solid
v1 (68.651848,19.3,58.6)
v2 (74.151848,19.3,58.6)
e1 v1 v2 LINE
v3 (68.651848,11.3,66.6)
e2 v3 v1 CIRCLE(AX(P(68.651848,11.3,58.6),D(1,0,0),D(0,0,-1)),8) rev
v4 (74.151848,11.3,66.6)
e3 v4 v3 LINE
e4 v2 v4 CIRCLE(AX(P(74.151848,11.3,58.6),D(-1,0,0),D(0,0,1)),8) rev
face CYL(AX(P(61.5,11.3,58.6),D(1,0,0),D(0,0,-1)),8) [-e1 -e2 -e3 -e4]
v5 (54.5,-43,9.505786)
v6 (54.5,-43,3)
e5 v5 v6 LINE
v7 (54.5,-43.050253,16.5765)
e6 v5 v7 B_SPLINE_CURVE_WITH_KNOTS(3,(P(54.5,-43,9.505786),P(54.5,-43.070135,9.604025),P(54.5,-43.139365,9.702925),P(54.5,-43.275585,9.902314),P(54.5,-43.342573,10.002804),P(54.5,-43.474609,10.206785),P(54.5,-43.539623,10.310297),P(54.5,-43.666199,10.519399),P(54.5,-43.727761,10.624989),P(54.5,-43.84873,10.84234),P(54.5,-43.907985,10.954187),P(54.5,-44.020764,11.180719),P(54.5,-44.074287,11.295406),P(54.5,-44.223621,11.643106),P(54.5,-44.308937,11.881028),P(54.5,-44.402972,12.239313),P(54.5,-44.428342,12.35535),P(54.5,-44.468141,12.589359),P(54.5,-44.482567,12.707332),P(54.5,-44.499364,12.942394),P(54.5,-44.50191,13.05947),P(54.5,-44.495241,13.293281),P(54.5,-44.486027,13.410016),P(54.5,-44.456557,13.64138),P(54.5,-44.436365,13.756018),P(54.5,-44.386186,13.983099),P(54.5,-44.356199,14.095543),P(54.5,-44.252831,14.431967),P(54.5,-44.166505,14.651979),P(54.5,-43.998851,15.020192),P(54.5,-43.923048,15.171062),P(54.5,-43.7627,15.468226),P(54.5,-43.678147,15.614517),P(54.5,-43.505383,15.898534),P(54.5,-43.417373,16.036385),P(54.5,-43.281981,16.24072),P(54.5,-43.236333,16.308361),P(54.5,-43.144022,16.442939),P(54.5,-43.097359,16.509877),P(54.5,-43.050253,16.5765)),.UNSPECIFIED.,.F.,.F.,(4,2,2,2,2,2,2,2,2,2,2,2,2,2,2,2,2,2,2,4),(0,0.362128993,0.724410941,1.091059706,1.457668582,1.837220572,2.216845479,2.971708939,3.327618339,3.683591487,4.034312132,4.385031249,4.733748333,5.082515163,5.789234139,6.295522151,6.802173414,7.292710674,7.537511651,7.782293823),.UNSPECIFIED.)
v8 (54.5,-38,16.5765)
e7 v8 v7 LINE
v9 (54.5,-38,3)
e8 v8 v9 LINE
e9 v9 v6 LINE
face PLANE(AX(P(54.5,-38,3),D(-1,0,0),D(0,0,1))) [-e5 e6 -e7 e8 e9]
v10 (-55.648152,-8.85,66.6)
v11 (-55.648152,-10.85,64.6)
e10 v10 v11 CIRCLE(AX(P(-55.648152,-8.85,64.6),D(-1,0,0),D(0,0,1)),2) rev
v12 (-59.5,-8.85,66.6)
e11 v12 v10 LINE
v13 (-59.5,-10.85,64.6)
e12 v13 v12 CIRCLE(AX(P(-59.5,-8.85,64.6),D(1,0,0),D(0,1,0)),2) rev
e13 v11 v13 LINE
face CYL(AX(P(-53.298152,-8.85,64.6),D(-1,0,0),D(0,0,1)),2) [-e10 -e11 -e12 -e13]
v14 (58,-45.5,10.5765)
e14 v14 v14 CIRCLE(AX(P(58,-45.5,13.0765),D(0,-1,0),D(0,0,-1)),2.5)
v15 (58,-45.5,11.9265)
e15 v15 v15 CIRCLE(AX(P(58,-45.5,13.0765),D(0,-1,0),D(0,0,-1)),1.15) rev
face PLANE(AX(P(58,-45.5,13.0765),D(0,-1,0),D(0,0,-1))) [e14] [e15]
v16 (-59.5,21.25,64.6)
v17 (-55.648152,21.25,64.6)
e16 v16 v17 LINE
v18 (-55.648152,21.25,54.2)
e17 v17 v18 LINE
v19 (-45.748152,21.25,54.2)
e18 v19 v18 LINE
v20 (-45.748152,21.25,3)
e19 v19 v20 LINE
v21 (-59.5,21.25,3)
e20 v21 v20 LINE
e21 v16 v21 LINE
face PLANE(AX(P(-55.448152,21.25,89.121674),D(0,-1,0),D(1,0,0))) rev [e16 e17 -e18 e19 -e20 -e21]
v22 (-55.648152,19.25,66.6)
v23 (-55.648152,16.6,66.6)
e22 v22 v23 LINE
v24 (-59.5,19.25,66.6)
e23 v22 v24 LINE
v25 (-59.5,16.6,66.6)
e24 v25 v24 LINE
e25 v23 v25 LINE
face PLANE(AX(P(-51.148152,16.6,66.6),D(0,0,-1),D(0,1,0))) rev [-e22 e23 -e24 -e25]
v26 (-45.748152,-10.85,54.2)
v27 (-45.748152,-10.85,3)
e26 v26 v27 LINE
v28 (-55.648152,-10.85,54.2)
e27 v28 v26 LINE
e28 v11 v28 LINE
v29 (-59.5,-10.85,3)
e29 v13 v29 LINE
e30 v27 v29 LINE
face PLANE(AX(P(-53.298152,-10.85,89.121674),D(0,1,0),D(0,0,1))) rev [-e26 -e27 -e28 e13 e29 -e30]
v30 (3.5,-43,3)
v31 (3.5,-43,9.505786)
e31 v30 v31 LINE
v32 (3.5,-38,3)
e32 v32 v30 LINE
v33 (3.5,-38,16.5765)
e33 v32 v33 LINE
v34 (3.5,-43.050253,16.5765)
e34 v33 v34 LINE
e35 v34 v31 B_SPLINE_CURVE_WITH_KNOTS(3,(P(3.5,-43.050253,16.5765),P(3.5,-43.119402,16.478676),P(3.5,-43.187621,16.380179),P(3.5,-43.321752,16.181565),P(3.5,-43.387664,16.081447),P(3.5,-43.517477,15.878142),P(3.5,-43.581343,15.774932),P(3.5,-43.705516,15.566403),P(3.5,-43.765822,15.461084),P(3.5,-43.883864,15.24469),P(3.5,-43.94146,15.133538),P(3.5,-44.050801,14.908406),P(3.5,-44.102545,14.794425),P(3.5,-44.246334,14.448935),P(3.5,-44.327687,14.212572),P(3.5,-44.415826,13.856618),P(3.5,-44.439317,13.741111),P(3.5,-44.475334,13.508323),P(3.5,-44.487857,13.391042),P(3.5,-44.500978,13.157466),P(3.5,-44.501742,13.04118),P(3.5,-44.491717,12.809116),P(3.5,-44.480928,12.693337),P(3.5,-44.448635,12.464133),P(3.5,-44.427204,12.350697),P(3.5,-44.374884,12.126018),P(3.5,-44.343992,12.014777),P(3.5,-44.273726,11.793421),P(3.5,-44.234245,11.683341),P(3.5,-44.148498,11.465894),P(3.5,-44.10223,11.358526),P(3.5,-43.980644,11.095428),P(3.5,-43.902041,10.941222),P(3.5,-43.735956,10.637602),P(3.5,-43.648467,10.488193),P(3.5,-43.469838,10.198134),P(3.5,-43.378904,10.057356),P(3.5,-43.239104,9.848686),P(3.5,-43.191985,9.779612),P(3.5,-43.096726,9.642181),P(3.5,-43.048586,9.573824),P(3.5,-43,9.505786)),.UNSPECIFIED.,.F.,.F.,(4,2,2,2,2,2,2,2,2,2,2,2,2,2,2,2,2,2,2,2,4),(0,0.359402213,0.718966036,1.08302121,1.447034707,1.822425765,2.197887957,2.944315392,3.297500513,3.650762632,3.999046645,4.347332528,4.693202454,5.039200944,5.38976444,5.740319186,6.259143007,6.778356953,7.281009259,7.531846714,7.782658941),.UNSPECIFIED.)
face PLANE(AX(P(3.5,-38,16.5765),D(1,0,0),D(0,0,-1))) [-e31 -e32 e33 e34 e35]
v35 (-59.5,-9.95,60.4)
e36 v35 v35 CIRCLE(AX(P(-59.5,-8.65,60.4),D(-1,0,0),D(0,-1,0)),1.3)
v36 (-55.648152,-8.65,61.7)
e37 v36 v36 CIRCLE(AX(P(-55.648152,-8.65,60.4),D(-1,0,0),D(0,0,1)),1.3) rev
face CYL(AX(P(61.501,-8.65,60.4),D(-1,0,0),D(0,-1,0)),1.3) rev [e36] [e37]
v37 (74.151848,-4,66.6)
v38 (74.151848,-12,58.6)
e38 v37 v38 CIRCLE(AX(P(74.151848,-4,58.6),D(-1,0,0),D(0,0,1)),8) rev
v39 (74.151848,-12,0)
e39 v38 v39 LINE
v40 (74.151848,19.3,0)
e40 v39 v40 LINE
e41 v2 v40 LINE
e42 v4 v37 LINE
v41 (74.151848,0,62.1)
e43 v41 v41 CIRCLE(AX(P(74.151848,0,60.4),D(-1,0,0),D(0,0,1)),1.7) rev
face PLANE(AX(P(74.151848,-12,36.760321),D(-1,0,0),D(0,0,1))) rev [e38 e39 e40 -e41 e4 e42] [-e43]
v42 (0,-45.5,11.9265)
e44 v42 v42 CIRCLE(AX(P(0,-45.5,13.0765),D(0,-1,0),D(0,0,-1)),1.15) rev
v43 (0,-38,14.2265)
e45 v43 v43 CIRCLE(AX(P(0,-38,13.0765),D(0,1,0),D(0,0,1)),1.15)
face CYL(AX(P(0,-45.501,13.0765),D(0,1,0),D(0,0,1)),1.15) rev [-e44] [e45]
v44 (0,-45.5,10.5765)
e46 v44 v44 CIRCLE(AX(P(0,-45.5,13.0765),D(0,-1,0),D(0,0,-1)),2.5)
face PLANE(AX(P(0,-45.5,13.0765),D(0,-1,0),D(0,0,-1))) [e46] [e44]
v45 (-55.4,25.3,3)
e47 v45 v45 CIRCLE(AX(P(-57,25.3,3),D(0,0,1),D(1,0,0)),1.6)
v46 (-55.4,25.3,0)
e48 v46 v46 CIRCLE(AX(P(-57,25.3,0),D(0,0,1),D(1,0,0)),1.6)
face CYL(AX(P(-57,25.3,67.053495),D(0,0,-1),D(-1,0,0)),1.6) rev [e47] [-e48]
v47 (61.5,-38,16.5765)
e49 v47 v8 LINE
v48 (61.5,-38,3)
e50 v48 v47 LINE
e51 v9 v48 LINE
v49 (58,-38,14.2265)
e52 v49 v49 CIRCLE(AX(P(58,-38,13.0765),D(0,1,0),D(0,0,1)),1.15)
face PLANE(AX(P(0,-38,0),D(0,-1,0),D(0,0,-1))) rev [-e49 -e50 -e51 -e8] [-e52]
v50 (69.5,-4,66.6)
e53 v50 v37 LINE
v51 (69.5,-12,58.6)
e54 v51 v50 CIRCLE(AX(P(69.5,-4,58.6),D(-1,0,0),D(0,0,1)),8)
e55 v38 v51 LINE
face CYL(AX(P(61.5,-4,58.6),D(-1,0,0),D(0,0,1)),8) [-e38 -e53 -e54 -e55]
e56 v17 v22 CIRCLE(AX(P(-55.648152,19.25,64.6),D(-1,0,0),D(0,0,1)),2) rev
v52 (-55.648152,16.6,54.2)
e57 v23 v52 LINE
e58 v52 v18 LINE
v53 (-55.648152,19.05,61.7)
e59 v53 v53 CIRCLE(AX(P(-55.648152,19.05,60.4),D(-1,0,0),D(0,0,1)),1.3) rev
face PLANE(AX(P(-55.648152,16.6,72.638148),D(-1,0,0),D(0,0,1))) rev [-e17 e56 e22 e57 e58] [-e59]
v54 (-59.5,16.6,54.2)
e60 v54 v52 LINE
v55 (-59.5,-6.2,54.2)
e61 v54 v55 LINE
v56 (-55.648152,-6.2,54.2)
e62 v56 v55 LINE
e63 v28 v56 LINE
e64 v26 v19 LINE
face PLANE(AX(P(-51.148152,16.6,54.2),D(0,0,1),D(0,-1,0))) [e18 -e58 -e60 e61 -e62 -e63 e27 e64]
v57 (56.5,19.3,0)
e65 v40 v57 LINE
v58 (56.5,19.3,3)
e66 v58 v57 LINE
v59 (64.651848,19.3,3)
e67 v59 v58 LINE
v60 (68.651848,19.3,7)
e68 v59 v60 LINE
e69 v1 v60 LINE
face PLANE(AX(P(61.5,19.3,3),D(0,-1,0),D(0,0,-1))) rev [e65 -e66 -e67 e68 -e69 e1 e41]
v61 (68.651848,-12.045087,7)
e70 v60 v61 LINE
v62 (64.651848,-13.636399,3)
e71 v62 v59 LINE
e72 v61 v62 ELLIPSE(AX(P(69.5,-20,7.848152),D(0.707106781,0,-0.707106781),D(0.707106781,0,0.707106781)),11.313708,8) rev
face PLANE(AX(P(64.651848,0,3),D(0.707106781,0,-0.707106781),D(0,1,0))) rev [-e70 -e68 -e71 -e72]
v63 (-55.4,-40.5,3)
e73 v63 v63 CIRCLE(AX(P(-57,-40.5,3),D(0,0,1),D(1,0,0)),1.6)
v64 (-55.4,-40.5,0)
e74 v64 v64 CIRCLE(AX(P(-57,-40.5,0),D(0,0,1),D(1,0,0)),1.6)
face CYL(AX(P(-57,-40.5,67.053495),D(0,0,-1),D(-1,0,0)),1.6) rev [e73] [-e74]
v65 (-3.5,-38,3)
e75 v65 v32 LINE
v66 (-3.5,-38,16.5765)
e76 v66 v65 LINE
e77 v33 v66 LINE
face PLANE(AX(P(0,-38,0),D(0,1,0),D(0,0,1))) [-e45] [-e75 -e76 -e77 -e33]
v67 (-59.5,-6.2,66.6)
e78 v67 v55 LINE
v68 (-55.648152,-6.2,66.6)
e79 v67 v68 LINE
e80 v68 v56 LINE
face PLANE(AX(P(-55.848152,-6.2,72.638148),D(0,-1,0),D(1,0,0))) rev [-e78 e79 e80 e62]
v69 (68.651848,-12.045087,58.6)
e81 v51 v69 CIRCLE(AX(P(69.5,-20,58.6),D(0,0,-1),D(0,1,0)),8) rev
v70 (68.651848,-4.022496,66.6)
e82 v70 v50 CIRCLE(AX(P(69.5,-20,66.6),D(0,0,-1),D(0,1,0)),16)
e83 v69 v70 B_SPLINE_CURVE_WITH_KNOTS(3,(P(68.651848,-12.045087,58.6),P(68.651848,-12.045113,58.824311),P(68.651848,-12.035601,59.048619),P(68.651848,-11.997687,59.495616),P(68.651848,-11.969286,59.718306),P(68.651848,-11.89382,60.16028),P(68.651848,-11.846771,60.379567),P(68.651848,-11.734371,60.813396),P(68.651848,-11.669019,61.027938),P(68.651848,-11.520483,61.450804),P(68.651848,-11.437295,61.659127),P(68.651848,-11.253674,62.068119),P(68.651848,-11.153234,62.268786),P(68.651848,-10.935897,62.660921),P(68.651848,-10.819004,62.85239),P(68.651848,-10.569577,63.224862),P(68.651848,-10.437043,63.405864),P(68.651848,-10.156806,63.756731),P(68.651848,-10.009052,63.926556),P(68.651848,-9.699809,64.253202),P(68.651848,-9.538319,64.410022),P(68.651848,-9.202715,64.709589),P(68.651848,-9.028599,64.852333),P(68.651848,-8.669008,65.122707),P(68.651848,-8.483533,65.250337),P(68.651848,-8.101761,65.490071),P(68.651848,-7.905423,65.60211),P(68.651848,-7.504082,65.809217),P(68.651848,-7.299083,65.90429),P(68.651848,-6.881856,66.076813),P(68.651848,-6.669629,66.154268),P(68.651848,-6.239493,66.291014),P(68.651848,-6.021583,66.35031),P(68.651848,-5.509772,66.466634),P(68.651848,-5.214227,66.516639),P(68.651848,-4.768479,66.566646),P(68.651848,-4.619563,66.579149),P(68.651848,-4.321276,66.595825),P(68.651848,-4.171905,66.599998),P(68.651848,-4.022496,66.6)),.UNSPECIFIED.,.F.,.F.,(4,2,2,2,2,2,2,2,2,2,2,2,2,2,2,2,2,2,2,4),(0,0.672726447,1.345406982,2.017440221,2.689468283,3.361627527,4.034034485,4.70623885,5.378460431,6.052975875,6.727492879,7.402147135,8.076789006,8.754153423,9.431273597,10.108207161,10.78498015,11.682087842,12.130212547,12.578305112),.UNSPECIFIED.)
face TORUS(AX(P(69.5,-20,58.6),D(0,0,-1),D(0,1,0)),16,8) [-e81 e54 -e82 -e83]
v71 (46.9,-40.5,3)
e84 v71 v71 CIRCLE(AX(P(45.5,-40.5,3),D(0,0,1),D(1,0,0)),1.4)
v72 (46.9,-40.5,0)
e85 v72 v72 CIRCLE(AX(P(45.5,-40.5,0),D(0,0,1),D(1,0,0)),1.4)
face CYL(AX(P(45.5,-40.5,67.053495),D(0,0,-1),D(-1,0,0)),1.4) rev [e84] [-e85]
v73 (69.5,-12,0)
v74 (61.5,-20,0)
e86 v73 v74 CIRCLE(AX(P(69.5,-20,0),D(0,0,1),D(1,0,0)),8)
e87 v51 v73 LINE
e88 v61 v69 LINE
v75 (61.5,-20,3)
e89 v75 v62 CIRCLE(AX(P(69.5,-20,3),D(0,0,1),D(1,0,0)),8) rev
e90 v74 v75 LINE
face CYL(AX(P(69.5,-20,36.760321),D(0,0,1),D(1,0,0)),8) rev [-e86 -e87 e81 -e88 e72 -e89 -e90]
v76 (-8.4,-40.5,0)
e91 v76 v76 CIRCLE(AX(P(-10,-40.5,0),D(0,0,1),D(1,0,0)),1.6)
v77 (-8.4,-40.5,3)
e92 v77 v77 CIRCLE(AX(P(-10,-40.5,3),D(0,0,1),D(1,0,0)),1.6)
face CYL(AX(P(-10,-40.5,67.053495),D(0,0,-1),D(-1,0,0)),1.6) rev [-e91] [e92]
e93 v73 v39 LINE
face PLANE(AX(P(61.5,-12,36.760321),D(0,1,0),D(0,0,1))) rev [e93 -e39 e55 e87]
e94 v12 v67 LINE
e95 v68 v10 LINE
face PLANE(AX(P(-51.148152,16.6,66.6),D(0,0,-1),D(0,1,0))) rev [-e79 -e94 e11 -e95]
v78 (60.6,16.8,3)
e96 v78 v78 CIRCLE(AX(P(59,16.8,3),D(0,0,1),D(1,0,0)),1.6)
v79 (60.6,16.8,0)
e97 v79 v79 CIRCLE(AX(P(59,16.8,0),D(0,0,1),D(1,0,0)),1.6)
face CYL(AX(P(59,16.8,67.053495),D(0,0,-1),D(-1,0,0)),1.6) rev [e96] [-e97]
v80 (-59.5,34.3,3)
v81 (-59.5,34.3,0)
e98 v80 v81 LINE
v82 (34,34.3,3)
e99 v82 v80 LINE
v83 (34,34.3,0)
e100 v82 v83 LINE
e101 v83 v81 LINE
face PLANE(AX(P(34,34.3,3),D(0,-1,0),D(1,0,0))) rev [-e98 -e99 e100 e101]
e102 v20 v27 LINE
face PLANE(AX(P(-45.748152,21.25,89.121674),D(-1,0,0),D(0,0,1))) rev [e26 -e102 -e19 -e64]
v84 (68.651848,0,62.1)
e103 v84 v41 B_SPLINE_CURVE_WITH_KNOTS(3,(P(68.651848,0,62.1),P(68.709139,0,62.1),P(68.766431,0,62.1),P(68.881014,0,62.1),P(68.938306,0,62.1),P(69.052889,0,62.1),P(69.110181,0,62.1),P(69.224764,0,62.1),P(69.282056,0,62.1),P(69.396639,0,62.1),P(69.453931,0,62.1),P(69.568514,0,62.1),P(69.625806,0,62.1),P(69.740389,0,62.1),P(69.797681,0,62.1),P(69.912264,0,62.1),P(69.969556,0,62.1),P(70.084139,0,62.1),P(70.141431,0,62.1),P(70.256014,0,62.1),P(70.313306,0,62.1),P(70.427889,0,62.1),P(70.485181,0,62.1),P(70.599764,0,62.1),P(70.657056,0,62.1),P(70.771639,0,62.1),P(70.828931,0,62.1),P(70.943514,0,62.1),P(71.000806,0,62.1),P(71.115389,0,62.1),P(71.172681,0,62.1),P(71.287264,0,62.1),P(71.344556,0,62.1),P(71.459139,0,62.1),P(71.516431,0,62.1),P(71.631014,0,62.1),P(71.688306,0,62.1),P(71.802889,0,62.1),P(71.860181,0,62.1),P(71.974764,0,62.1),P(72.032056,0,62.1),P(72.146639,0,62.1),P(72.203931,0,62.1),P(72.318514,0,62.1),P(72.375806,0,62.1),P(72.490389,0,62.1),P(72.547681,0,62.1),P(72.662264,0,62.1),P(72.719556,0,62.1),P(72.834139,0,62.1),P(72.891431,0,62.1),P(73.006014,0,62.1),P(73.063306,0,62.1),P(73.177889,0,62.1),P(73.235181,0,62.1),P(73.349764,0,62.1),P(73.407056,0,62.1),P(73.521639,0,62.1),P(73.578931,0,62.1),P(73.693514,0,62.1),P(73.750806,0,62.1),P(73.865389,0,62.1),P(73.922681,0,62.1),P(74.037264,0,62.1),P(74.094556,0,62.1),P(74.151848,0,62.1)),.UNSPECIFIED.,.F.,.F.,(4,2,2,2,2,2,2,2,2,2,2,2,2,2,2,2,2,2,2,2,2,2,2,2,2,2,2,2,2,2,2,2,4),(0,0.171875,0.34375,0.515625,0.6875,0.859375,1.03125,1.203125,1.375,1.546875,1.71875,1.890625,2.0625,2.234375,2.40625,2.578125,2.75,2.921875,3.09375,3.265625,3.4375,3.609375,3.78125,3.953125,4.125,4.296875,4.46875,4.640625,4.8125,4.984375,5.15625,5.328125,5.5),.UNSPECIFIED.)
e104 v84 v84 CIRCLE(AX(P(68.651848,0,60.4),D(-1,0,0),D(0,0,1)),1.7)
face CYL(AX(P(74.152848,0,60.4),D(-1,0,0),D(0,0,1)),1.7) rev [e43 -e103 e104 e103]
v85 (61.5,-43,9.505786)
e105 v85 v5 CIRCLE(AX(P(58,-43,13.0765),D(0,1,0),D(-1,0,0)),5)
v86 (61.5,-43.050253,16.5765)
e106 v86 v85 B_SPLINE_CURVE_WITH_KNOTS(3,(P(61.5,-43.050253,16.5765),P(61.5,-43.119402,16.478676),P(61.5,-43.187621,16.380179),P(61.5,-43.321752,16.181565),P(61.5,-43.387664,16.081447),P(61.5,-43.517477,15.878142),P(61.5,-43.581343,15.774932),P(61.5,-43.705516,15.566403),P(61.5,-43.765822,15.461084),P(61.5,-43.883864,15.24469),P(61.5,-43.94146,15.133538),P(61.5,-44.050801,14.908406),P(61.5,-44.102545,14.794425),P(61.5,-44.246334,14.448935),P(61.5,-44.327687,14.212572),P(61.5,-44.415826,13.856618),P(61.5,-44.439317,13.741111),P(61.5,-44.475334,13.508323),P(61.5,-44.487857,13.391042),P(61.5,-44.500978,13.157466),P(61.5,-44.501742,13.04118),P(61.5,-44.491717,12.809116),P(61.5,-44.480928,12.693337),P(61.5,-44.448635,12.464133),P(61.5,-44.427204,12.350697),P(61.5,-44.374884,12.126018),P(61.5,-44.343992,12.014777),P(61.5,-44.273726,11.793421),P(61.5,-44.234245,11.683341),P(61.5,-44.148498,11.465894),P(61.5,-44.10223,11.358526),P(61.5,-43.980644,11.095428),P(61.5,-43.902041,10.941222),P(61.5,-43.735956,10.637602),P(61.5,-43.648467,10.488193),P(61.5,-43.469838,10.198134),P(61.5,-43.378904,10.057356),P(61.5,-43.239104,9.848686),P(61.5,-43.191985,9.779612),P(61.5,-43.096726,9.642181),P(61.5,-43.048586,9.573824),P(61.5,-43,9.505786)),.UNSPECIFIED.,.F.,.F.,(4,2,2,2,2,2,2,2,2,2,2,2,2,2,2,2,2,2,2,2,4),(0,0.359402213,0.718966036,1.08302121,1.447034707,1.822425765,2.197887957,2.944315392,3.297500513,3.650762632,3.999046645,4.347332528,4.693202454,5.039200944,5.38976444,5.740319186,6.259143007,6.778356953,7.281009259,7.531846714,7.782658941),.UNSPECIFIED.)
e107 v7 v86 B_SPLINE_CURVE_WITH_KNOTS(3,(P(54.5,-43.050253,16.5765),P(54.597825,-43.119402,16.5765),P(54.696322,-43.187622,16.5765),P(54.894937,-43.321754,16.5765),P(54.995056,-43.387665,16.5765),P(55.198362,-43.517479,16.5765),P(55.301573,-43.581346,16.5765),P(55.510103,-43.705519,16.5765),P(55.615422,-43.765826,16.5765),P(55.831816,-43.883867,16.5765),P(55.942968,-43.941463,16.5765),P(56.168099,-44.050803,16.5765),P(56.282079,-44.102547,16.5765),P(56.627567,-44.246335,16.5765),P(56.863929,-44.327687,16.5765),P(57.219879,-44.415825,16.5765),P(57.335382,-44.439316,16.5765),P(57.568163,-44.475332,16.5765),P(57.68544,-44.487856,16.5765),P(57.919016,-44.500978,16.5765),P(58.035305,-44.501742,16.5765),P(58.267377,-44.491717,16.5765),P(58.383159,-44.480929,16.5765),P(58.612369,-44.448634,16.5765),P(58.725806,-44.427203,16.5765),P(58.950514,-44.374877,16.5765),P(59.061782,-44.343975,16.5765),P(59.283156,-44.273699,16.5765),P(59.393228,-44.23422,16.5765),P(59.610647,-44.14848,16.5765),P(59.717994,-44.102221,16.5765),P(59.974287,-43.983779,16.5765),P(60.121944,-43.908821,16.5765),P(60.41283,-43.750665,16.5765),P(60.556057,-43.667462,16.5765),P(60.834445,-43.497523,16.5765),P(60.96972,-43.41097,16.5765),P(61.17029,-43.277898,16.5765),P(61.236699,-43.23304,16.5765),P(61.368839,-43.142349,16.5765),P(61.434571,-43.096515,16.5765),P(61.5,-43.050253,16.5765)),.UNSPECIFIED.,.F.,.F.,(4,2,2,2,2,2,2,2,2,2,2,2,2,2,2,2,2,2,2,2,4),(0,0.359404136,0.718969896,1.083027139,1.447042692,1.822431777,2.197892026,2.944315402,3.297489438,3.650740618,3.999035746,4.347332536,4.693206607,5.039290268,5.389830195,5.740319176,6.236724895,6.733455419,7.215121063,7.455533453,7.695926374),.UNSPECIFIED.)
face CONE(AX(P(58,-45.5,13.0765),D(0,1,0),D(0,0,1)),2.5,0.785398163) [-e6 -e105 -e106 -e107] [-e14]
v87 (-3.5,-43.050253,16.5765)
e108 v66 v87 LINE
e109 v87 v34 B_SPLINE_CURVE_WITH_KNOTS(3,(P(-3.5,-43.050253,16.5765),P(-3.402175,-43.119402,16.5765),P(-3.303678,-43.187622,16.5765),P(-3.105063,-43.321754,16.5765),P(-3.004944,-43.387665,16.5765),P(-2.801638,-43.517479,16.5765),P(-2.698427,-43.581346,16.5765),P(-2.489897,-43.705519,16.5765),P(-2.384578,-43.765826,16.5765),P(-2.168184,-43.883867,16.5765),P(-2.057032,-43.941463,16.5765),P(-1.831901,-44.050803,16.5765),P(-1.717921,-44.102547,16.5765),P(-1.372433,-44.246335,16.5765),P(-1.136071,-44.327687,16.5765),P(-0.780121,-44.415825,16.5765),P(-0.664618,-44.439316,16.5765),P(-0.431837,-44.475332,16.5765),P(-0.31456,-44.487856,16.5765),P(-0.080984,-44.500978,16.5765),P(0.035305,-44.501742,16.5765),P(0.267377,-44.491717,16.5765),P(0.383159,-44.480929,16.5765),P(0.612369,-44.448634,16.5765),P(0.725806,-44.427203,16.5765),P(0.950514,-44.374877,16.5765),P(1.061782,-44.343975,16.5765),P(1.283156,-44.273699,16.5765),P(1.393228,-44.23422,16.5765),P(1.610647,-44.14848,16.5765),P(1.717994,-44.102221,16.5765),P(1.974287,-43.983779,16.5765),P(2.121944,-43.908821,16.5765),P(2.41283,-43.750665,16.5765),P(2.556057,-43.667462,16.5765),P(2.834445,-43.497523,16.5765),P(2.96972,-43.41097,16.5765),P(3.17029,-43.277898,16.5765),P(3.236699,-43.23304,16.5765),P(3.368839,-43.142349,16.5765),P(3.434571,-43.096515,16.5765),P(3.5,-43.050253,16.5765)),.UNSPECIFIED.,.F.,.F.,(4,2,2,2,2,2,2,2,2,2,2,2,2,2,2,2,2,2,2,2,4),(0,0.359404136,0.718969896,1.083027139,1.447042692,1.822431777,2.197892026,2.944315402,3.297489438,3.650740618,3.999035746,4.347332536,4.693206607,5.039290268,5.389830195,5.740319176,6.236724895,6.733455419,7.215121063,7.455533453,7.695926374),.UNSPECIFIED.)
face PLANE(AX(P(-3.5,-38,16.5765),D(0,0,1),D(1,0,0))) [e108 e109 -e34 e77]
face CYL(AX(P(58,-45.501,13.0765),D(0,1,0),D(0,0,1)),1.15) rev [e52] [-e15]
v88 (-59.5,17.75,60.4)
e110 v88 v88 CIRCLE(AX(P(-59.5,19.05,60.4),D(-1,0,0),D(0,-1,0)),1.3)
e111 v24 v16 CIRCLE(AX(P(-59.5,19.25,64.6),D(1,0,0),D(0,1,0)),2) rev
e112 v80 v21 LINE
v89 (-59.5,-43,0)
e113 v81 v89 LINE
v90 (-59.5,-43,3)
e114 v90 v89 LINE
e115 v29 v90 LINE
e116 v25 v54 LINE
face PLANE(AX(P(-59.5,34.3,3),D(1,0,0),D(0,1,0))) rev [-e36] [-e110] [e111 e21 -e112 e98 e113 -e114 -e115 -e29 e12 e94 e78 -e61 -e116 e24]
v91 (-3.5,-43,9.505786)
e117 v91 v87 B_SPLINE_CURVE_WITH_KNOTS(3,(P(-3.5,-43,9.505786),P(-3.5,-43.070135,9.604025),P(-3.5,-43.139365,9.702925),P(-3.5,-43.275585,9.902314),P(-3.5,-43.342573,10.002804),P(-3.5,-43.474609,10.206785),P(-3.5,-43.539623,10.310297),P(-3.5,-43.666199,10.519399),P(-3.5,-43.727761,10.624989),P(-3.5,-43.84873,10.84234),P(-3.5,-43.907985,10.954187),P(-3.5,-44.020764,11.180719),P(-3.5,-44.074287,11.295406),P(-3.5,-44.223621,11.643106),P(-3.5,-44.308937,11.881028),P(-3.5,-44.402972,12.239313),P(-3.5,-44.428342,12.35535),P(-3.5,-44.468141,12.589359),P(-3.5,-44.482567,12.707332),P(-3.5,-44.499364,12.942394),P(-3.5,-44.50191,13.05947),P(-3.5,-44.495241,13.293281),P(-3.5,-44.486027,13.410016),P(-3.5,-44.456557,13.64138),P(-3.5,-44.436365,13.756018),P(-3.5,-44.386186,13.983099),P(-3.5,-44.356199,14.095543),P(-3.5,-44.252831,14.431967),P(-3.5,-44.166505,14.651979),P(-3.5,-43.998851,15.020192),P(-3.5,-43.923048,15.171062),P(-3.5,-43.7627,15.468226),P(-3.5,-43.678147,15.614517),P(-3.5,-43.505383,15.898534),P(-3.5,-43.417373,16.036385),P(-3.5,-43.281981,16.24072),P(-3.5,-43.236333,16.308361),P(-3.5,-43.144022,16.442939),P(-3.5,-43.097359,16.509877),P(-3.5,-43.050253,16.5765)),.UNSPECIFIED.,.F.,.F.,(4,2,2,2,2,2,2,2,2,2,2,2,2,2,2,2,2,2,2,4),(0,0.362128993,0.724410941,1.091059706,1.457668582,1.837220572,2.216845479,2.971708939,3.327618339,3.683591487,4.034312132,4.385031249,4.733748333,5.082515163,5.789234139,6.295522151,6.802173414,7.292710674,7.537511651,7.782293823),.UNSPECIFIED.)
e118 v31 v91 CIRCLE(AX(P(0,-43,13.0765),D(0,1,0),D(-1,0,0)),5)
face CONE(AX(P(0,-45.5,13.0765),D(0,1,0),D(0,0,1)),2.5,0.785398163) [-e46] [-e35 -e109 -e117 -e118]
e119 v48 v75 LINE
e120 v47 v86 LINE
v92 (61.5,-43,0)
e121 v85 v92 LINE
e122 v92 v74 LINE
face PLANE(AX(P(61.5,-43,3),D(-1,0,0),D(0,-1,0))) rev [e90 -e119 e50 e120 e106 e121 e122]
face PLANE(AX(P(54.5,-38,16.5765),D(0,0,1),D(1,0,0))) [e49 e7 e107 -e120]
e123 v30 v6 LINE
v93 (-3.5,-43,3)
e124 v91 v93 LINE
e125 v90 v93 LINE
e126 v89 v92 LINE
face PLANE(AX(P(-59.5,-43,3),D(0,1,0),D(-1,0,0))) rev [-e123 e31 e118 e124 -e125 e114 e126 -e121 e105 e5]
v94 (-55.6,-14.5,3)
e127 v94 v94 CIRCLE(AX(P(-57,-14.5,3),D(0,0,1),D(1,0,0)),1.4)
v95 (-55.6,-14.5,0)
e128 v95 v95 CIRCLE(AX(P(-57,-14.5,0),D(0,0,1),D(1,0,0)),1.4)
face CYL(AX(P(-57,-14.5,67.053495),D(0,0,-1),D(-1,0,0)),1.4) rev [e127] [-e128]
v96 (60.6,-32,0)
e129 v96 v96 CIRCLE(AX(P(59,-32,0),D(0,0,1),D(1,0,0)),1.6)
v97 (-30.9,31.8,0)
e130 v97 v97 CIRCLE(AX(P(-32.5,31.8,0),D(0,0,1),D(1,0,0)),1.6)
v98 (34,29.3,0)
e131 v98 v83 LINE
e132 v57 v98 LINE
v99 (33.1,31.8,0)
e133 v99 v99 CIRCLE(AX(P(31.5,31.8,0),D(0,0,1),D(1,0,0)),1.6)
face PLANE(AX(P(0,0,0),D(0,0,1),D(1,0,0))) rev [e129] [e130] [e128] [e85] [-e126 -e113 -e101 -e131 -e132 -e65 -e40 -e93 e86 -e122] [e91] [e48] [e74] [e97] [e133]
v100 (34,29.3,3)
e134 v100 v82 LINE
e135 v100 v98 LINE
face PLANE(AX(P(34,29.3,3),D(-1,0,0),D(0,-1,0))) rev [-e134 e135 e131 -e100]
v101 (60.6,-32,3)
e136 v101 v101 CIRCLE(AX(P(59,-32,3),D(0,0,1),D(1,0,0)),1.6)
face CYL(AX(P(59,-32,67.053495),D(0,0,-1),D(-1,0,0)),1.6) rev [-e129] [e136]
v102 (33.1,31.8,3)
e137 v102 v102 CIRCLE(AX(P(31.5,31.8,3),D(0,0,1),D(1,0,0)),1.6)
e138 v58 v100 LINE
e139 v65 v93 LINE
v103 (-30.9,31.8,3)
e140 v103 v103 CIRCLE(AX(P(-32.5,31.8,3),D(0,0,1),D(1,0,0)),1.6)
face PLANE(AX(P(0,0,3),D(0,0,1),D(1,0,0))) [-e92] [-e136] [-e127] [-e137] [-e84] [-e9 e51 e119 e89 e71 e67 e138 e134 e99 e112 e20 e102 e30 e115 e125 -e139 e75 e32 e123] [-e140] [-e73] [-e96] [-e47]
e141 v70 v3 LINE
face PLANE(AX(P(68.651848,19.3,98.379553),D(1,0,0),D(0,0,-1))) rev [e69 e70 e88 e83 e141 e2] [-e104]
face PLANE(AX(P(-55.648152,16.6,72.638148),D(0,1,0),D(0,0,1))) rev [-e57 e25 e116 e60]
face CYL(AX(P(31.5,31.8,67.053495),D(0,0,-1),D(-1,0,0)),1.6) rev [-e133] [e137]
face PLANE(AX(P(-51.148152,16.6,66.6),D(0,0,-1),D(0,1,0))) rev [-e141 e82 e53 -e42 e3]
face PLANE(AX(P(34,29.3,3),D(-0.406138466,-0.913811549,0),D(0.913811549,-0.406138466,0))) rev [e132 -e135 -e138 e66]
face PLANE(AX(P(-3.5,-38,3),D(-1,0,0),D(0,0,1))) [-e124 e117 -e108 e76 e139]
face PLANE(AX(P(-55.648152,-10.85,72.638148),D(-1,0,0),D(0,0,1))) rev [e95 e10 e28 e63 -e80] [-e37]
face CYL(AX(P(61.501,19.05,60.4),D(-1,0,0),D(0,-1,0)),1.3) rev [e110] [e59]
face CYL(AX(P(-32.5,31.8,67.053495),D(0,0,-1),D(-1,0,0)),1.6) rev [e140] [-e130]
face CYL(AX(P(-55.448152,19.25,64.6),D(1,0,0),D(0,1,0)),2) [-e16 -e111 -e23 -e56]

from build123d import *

# Parameters (mm, degrees)
BASE_DEPTH          = 3
SERVO_SUPPORT_DEPTH = 54.2
SERVO_MOUNTS_DEPTH  = 12.4
SERVO_SCREWS_REACH  = 146.657
SKETCH22_R          = 1.3
FILLET1_R           = 2
SKETCH23_W          = 12.651847812
SKETCH23_H          = 31.3
SHAFT_SUPPORT_DEPTH = 3
SKETCH24_W          = 5.5
SKETCH24_H          = 31.3
BOSS_EXTRUDE6_DEPTH = 66.6
FILLET2_R           = 8
FILLET3_R           = 8
SHAFT_REACH         = 152.69
SKETCH25_R          = 1.7
SCREWS_REACH        = 110.55
SKETCH26_R          = 1.6
SKETCH26_R_2        = 1.4
SKETCH31_W          = 7
SKETCH31_H          = 13.5765
BOSS_EXTRUDE8_DEPTH = 5
SKETCH30_R          = 2.5
BOSS_EXTRUDE9_DEPTH = 2.5
CUT_EXTRUDE1_REACH  = 125.131
SKETCH32_R          = 1.15
CHAMFER1_SIZE       = 2.5
CHAMFER2_SIZE       = 4


with BuildPart() as part:
    # Sketch19 → Base (new body)
    with BuildSketch(Plane.XY):
        Polygon((61.5, 19.3), (56.5, 19.3), (34, 29.3), (34, 34.3), (-59.5, 34.3), (-59.5, -43), (61.5, -43), align=None)
    extrude(amount=BASE_DEPTH)

    # Sketch20 → Servo support (add)
    with BuildSketch(Plane.XY):
        Polygon((-53.298152188, -10.85), (-55.448152188, -10.85), (-59.5, -10.85), (-59.5, 21.25), (-55.448152188, 21.25), (-53.298152188, 21.25), (-45.748152188, 21.25), (-45.748152188, 8.609473612), (-45.748152188, -10.85), align=None)
    extrude(amount=SERVO_SUPPORT_DEPTH)

    # Sketch21 → Servo mounts (add)
    with BuildSketch(Plane.XY.offset(54.2)):
        Polygon((-55.848152188, -6.2), (-59.5, -6.2), (-59.5, -10.85), (-55.648152188, -10.85), (-55.648152188, -6.2), align=None)
        Polygon((-55.848152188, 16.6), (-59.5, 16.6), (-59.5, 21.25), (-55.648152188, 21.25), (-55.648152188, 16.6), align=None)
    extrude(amount=SERVO_MOUNTS_DEPTH)

    # Sketch22 → Servo screws (cut, up to next)
    with BuildSketch(Plane.ZY.offset(59.5), mode=Mode.PRIVATE) as servo_screws_sk1:
        with Locations(Location((60.4, -8.65, 0), (0, 0, 270))):
            Circle(SKETCH22_R)
    servo_screws_tool1 = extrude(servo_screws_sk1.sketch, amount=-SERVO_SCREWS_REACH, mode=Mode.PRIVATE) & part.part
    # Sketch22 → Servo screws (cut, up to next)
    with BuildSketch(Plane.ZY.offset(59.5), mode=Mode.PRIVATE) as servo_screws_sk2:
        with Locations(Location((60.4, 19.05, 0), (0, 0, 270))):
            Circle(SKETCH22_R)
    servo_screws_tool2 = extrude(servo_screws_sk2.sketch, amount=-SERVO_SCREWS_REACH, mode=Mode.PRIVATE) & part.part
    add(servo_screws_tool1.solids().sort_by_distance((-59.5, -8.65, 60.4))[0], mode=Mode.SUBTRACT)
    add(servo_screws_tool2.solids().sort_by_distance((-59.5, 19.05, 60.4))[0], mode=Mode.SUBTRACT)

    # Fillet1
    fillet1_edges = [part.edges().sort_by_distance(p)[0] for p in [
        (-57.574076094, 21.25, 66.6),
        (-57.574076094, -10.85, 66.6),
    ]]
    fillet(fillet1_edges, radius=FILLET1_R)

    # Sketch23 → Shaft support (add)
    with BuildSketch(Plane.XY):
        with Locations((67.825923906, 3.65)):
            Rectangle(SKETCH23_W, SKETCH23_H)
    extrude(amount=SHAFT_SUPPORT_DEPTH)

    # Sketch24 → Boss-Extrude6 (add)
    with BuildSketch(Plane.XY):
        with Locations((71.401847812, 3.65)):
            Rectangle(SKETCH24_W, SKETCH24_H)
    extrude(amount=BOSS_EXTRUDE6_DEPTH)

    # Fillet2
    fillet2_edges = [part.edges().sort_by_distance(p)[0] for p in [
        (61.5, -12, 1.5),
    ]]
    fillet(fillet2_edges, radius=FILLET2_R)

    # Fillet3
    fillet3_edges = [part.edges().sort_by_distance(p)[0] for p in [
        (71.401847812, 19.3, 66.6),
        (71.825923906, -12, 66.6),
        (69.075325128, -12.011279749, 66.6),
    ]]
    fillet(fillet3_edges, radius=FILLET3_R)

    # Sketch25 → Shaft (cut, up to next)
    with BuildSketch(Plane.ZY.offset(-68.651847812), mode=Mode.PRIVATE) as shaft_sk1:
        with Locations((60.4, 0)):
            Circle(SKETCH25_R)
    shaft_tool1 = extrude(shaft_sk1.sketch, amount=-SHAFT_REACH, mode=Mode.PRIVATE) & part.part
    add(shaft_tool1.solids().sort_by_distance((68.651848, 0, 60.4))[0], mode=Mode.SUBTRACT)

    # Sketch26 → Screws (cut, up to next)
    with BuildSketch(Plane.XY, mode=Mode.PRIVATE) as screws_sk1:
        with Locations((-57, -40.5)):
            Circle(SKETCH26_R)
    screws_tool1 = extrude(screws_sk1.sketch, amount=SCREWS_REACH, mode=Mode.PRIVATE) & part.part
    # Sketch26 → Screws (cut, up to next)
    with BuildSketch(Plane.XY, mode=Mode.PRIVATE) as screws_sk2:
        with Locations((-10, -40.5)):
            Circle(SKETCH26_R)
    screws_tool2 = extrude(screws_sk2.sketch, amount=SCREWS_REACH, mode=Mode.PRIVATE) & part.part
    # Sketch26 → Screws (cut, up to next)
    with BuildSketch(Plane.XY, mode=Mode.PRIVATE) as screws_sk3:
        with Locations((59, -32)):
            Circle(SKETCH26_R)
    screws_tool3 = extrude(screws_sk3.sketch, amount=SCREWS_REACH, mode=Mode.PRIVATE) & part.part
    # Sketch26 → Screws (cut, up to next)
    with BuildSketch(Plane.XY, mode=Mode.PRIVATE) as screws_sk4:
        with Locations((59, 16.8)):
            Circle(SKETCH26_R)
    screws_tool4 = extrude(screws_sk4.sketch, amount=SCREWS_REACH, mode=Mode.PRIVATE) & part.part
    # Sketch26 → Screws (cut, up to next)
    with BuildSketch(Plane.XY, mode=Mode.PRIVATE) as screws_sk5:
        with Locations((31.5, 31.8)):
            Circle(SKETCH26_R)
    screws_tool5 = extrude(screws_sk5.sketch, amount=SCREWS_REACH, mode=Mode.PRIVATE) & part.part
    # Sketch26 → Screws (cut, up to next)
    with BuildSketch(Plane.XY, mode=Mode.PRIVATE) as screws_sk6:
        with Locations((-32.5, 31.8)):
            Circle(SKETCH26_R)
    screws_tool6 = extrude(screws_sk6.sketch, amount=SCREWS_REACH, mode=Mode.PRIVATE) & part.part
    # Sketch26 → Screws (cut, up to next)
    with BuildSketch(Plane.XY, mode=Mode.PRIVATE) as screws_sk7:
        with Locations((-57, 25.3)):
            Circle(SKETCH26_R)
    screws_tool7 = extrude(screws_sk7.sketch, amount=SCREWS_REACH, mode=Mode.PRIVATE) & part.part
    # Sketch26 → Screws (cut, up to next)
    with BuildSketch(Plane.XY, mode=Mode.PRIVATE) as screws_sk8:
        with Locations((-57, -14.5)):
            Circle(SKETCH26_R_2)
    screws_tool8 = extrude(screws_sk8.sketch, amount=SCREWS_REACH, mode=Mode.PRIVATE) & part.part
    # Sketch26 → Screws (cut, up to next)
    with BuildSketch(Plane.XY, mode=Mode.PRIVATE) as screws_sk9:
        with Locations((45.5, -40.5)):
            Circle(SKETCH26_R_2)
    screws_tool9 = extrude(screws_sk9.sketch, amount=SCREWS_REACH, mode=Mode.PRIVATE) & part.part
    add(screws_tool1.solids().sort_by_distance((-57, -40.5, 0))[0], mode=Mode.SUBTRACT)
    add(screws_tool2.solids().sort_by_distance((-10, -40.5, 0))[0], mode=Mode.SUBTRACT)
    add(screws_tool3.solids().sort_by_distance((59, -32, 0))[0], mode=Mode.SUBTRACT)
    add(screws_tool4.solids().sort_by_distance((59, 16.8, 0))[0], mode=Mode.SUBTRACT)
    add(screws_tool5.solids().sort_by_distance((31.5, 31.8, 0))[0], mode=Mode.SUBTRACT)
    add(screws_tool6.solids().sort_by_distance((-32.5, 31.8, 0))[0], mode=Mode.SUBTRACT)
    add(screws_tool7.solids().sort_by_distance((-57, 25.3, 0))[0], mode=Mode.SUBTRACT)
    add(screws_tool8.solids().sort_by_distance((-57, -14.5, 0))[0], mode=Mode.SUBTRACT)
    add(screws_tool9.solids().sort_by_distance((45.5, -40.5, 0))[0], mode=Mode.SUBTRACT)

    # Sketch31 → Boss-Extrude8 (add)
    with BuildSketch(Plane.XZ.offset(43)):
        with Locations((0, 9.78825)):
            Rectangle(SKETCH31_W, SKETCH31_H)
        with Locations((58, 9.78825)):
            Rectangle(SKETCH31_W, SKETCH31_H)
    extrude(amount=-BOSS_EXTRUDE8_DEPTH)

    # Sketch30 → Boss-Extrude9 (add)
    with BuildSketch(Plane.XZ.offset(43)):
        with Locations(Location((0, 13.0765, 0), (0, 0, 180))):
            Circle(SKETCH30_R)
        with Locations(Location((58, 13.0765, 0), (0, 0, 180))):
            Circle(SKETCH30_R)
    extrude(amount=BOSS_EXTRUDE9_DEPTH)

    # Sketch32 → Cut-Extrude1 (cut, up to next)
    with BuildSketch(Plane(origin=(0, -38, 0), x_dir=(1, 0, 0), z_dir=(0, 1, 0)), mode=Mode.PRIVATE) as cut_extrude1_sk1:
        with Locations(Location((0, -13.0765, 0), (0, 0, 270))):
            Circle(SKETCH32_R)
    cut_extrude1_tool1 = extrude(cut_extrude1_sk1.sketch, amount=-CUT_EXTRUDE1_REACH, mode=Mode.PRIVATE) & part.part
    # Sketch32 → Cut-Extrude1 (cut, up to next)
    with BuildSketch(Plane(origin=(0, -38, 0), x_dir=(1, 0, 0), z_dir=(0, 1, 0)), mode=Mode.PRIVATE) as cut_extrude1_sk2:
        with Locations(Location((58, -13.0765, 0), (0, 0, 270))):
            Circle(SKETCH32_R)
    cut_extrude1_tool2 = extrude(cut_extrude1_sk2.sketch, amount=-CUT_EXTRUDE1_REACH, mode=Mode.PRIVATE) & part.part
    add(cut_extrude1_tool1.solids().sort_by_distance((0, -38, 13.0765))[0], mode=Mode.SUBTRACT)
    add(cut_extrude1_tool2.solids().sort_by_distance((58, -38, 13.0765))[0], mode=Mode.SUBTRACT)

    # Chamfer1
    # the kernel refuses this chamfer: 2.5 mm, written as the material it adds along each edge
    with BuildSketch(Plane(origin=(58, -43, 13.0765), x_dir=(-1, 0, 0), z_dir=(0, 0, 1))) as chamfer1_piece_1_section:
        Polygon((2.5 + CHAMFER1_SIZE, 0), (2.5, CHAMFER1_SIZE), (2.5, 0), align=None)
    chamfer1_piece_1 = revolve(axis=Axis((58, -43, 13.0765), (0, -1, 0)), mode=Mode.PRIVATE)
    chamfer1_piece_1 = split(chamfer1_piece_1, bisect_by=Plane(origin=(61.5, -43.330528144, 9.079752975), z_dir=(-1, 0, 0)), keep=Keep.TOP, mode=Mode.PRIVATE)
    chamfer1_piece_1 = split(chamfer1_piece_1, bisect_by=Plane(origin=(54.5, -43.330528144, 9.079752975), z_dir=(1, 0, 0)), keep=Keep.TOP, mode=Mode.PRIVATE)
    chamfer1_piece_1 = split(chamfer1_piece_1, bisect_by=Plane(origin=(55.692477029, -43.330528144, 16.5765), z_dir=(0, 0, -1)), keep=Keep.TOP, mode=Mode.PRIVATE)
    chamfer1_piece_1 = split(chamfer1_piece_1, bisect_by=Plane(origin=(55.692477029, -45.5, 9.079752975), z_dir=(0, 1, 0)), keep=Keep.TOP, mode=Mode.PRIVATE)
    add(chamfer1_piece_1)
    with BuildSketch(Plane(origin=(0, -43, 13.0765), x_dir=(-1, 0, 0), z_dir=(0, 0, 1))) as chamfer1_piece_2_section:
        Polygon((2.5 + CHAMFER1_SIZE, 0), (2.5, CHAMFER1_SIZE), (2.5, 0), align=None)
    chamfer1_piece_2 = revolve(axis=Axis((0, -43, 13.0765), (0, -1, 0)), mode=Mode.PRIVATE)
    chamfer1_piece_2 = split(chamfer1_piece_2, bisect_by=Plane(origin=(-3.5, -43.330528144, 9.079752976), z_dir=(1, 0, 0)), keep=Keep.TOP, mode=Mode.PRIVATE)
    chamfer1_piece_2 = split(chamfer1_piece_2, bisect_by=Plane(origin=(-2.30752297, -43.330528144, 16.5765), z_dir=(0, 0, -1)), keep=Keep.TOP, mode=Mode.PRIVATE)
    chamfer1_piece_2 = split(chamfer1_piece_2, bisect_by=Plane(origin=(3.5, -43.330528144, 9.079752976), z_dir=(-1, 0, 0)), keep=Keep.TOP, mode=Mode.PRIVATE)
    chamfer1_piece_2 = split(chamfer1_piece_2, bisect_by=Plane(origin=(-2.30752297, -45.5, 9.079752976), z_dir=(0, 1, 0)), keep=Keep.TOP, mode=Mode.PRIVATE)
    add(chamfer1_piece_2)

    # Chamfer2
    chamfer2_edges = [part.edges().sort_by_distance(p)[0] for p in [
        (68.651847812, 3.627456407, 3),
    ]]
    chamfer(chamfer2_edges, length=CHAMFER2_SIZE)


solid = part.part
